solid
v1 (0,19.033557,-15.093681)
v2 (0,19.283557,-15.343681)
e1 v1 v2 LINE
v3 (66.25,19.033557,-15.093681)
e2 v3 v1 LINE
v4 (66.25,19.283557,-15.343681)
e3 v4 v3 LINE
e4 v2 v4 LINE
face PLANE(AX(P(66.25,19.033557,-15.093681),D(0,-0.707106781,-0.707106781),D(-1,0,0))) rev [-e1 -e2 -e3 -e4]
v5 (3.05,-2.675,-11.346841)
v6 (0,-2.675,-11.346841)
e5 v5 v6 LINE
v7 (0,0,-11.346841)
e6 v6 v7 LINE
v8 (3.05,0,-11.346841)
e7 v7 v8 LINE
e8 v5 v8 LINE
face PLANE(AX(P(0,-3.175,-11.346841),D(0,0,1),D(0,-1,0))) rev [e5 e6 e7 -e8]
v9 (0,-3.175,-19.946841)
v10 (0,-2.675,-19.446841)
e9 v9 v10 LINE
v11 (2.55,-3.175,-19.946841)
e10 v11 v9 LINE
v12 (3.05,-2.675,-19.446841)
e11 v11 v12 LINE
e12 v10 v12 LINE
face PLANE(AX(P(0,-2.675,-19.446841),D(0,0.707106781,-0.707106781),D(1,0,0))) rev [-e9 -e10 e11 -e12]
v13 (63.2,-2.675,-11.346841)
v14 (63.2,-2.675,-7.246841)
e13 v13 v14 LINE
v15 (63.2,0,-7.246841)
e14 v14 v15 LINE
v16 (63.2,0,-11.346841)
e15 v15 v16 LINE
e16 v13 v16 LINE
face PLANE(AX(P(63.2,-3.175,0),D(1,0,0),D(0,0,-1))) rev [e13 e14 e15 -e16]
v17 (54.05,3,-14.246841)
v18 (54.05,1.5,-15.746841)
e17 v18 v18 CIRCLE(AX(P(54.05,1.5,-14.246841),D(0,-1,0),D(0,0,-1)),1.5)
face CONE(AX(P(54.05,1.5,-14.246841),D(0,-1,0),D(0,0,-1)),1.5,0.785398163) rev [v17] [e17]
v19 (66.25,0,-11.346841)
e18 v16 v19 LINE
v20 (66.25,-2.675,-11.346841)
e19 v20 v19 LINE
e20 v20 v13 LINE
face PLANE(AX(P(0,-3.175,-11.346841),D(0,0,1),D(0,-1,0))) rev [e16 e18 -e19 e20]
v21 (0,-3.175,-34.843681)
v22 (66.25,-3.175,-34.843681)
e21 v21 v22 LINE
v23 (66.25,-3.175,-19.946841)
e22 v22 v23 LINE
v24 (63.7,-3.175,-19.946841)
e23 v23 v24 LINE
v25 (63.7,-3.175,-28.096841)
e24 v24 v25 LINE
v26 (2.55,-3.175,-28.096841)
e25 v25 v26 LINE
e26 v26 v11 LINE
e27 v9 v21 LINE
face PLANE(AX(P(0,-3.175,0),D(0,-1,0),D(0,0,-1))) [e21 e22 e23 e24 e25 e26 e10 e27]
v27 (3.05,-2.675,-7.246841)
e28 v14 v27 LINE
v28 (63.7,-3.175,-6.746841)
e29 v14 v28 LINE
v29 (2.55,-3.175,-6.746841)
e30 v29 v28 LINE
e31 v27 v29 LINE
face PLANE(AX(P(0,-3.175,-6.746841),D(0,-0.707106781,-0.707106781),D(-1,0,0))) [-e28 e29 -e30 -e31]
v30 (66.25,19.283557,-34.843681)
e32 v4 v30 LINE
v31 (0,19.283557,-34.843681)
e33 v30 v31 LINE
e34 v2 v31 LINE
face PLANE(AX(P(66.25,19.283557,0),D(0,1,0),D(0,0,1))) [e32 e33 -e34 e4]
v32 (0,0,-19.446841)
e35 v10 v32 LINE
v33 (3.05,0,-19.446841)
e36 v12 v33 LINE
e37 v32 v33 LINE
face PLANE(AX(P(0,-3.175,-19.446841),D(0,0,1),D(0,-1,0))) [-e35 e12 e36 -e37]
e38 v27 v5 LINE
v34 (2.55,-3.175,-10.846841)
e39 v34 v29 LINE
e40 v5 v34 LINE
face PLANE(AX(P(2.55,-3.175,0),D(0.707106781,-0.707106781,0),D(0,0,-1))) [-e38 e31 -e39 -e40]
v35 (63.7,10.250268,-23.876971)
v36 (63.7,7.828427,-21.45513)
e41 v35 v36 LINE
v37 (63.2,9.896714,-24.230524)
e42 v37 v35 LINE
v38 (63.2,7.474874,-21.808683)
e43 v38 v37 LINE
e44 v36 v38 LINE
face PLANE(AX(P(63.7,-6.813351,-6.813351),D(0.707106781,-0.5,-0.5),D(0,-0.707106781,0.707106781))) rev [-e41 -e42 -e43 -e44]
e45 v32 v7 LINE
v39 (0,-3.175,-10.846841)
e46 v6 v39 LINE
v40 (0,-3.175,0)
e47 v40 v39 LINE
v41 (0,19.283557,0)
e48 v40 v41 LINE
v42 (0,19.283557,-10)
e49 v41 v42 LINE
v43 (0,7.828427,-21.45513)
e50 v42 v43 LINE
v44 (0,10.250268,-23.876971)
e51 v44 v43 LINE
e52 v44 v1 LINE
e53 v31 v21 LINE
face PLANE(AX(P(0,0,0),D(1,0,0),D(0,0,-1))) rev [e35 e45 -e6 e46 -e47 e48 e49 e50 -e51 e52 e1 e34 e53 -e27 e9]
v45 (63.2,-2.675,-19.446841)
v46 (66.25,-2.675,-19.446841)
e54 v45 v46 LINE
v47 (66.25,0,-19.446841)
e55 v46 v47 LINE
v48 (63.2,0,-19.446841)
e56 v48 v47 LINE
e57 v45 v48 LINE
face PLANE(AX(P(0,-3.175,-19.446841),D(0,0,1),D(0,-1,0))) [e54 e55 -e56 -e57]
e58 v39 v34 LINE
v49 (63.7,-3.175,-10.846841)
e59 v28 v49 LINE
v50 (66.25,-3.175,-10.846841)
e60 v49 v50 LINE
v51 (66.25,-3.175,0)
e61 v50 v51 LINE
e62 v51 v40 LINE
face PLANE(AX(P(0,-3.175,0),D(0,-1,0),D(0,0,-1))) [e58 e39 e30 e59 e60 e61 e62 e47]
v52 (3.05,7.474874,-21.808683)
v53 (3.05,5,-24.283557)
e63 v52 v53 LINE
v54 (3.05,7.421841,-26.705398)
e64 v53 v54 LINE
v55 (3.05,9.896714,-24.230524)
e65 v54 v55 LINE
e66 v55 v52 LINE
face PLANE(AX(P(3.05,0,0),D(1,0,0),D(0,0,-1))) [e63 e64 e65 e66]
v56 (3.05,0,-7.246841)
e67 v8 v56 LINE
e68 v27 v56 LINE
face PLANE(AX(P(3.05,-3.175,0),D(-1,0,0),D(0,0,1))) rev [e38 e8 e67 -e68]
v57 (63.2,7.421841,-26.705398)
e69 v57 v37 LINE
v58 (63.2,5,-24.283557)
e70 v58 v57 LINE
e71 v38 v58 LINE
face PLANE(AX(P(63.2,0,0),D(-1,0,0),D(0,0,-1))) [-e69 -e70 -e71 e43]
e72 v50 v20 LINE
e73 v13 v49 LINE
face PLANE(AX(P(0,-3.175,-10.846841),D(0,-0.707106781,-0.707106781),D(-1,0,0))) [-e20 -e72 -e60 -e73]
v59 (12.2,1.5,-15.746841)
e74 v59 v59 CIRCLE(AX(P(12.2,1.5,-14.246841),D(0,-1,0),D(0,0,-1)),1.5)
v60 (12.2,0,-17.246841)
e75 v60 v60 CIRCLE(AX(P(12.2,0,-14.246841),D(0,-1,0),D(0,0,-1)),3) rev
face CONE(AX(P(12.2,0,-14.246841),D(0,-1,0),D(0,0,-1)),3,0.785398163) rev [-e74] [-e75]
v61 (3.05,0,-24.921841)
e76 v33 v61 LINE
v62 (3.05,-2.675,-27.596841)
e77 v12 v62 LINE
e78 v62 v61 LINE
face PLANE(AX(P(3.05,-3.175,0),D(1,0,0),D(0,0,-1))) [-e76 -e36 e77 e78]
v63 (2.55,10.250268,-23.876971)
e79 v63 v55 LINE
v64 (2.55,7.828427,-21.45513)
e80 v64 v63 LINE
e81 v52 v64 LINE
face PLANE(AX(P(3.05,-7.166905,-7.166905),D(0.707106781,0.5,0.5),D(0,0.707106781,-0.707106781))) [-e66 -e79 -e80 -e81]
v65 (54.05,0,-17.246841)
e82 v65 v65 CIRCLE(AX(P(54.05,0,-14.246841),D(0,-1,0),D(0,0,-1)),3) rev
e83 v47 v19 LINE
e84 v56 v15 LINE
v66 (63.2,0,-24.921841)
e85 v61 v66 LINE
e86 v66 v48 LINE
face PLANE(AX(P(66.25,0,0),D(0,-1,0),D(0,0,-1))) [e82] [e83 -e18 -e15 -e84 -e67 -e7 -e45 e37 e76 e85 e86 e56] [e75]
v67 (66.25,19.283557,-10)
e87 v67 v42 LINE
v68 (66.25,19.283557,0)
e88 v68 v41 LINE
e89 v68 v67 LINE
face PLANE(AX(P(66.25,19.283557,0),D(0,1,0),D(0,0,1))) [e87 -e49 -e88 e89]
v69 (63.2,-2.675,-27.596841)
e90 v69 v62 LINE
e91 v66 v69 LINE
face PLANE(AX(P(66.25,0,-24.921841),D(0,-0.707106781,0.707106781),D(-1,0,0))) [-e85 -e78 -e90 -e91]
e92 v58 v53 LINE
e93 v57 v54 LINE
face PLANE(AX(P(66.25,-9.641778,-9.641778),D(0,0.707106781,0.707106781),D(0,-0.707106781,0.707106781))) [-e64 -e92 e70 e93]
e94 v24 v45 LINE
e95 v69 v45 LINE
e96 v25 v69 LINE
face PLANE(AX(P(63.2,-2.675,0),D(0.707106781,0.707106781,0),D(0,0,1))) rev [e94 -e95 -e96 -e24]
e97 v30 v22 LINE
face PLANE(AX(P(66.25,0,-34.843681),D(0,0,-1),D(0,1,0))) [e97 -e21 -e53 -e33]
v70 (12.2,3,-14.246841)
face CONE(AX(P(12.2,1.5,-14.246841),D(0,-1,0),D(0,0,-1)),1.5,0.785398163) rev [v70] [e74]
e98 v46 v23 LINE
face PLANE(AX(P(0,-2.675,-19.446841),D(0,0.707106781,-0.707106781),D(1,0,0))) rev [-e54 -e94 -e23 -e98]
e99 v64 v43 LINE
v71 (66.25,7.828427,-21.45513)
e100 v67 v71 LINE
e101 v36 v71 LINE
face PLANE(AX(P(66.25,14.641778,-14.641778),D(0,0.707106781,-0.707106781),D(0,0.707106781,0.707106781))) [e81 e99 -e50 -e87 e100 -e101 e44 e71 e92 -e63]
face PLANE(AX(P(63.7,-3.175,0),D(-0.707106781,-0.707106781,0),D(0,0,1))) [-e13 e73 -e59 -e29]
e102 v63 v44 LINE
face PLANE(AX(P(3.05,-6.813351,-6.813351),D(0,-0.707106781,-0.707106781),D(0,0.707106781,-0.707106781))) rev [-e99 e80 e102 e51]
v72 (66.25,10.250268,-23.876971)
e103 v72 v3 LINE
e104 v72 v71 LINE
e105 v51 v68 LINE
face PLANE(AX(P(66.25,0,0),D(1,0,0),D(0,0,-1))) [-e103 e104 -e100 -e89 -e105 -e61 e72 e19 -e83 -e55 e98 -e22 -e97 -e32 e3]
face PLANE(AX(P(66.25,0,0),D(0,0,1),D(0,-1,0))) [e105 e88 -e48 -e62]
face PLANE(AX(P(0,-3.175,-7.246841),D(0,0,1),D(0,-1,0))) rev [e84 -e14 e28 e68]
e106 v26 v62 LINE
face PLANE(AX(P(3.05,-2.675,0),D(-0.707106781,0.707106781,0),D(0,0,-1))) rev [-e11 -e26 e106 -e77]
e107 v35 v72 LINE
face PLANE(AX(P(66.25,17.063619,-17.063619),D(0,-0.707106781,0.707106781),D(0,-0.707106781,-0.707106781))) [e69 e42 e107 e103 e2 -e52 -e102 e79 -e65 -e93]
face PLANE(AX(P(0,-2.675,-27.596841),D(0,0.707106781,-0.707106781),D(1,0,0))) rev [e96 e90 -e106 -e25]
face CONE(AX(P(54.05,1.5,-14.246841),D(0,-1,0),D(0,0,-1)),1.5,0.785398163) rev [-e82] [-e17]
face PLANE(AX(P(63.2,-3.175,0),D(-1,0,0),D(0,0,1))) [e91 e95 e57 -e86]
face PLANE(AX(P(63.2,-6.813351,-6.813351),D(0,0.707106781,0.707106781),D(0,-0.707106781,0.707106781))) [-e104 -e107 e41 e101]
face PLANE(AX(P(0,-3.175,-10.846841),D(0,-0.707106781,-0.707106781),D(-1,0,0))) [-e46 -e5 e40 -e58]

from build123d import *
from OCP.BRepFilletAPI import BRepFilletAPI_MakeChamfer

# Parameters (mm, degrees)
BOSS_EXTRUDE1_DEPTH = 66.25
BOSS_EXTRUDE2_DEPTH = 3.05
BOSS_EXTRUDE3_DEPTH = 3.175
SKETCH2_4_R         = 1.5
CUT_EXTRUDE1_DEPTH  = 3
CHAMFER1_SIZE       = 1.5
CHAMFER3_SIZE       = 2.675
CHAMFER4_SIZE       = 0.5
CHAMFER4_SIZE_2     = 0.353553391


with BuildPart() as part:
    # Sketch1 → Boss-Extrude1 (new body)
    with BuildSketch(Plane(origin=(0, 0, 0), x_dir=(0, 0, -1), z_dir=(1, 0, 0))):
        Polygon((14.843681451, 19.28355698), (34.843681451, 19.28355698), (34.843681451, 0), (0, 0), (0, 19.28355698), (10, 19.28355698), (24.28355698, 5), (26.705397706, 7.421840726), align=None)
    extrude(amount=BOSS_EXTRUDE1_DEPTH)

    # Sketch1<4> → Boss-Extrude2 (add)
    with BuildSketch(Plane(origin=(0, 0, 0), x_dir=(0, 0, -1), z_dir=(1, 0, 0))):
        Polygon((23.876970581, 10.25026785), (21.455129855, 7.828427125), (24.28355698, 5), (26.705397706, 7.421840726), align=None)
    boss_extrude2 = extrude(amount=BOSS_EXTRUDE2_DEPTH)

    # Mirror1: Boss-Extrude2 across plane
    add(boss_extrude2.mirror(Plane.ZY.offset(-33.125)))

    # Sketch2 → Boss-Extrude3 (add)
    with BuildSketch(Plane(origin=(0, 0, 0), x_dir=(1, 0, 0), z_dir=(0, 1, 0))):
        Polygon((0, 11.346840726), (0, 0), (66.25, 0), (66.25, 11.346840726), (63.2, 11.346840726), (63.2, 7.246840726), (3.05, 7.246840726), (3.05, 11.346840726), align=None)
        Polygon((0, 34.843681451), (0, 19.446840726), (3.05, 19.446840726), (3.05, 27.596840726), (63.2, 27.596840726), (63.2, 19.446840726), (66.25, 19.446840726), (66.25, 34.843681451), align=None)
    extrude(amount=-BOSS_EXTRUDE3_DEPTH)

    # Sketch2<4> → Cut-Extrude1 (cut)
    with BuildSketch(Plane(origin=(0, 0, 0), x_dir=(1, 0, 0), z_dir=(0, 1, 0))):
        with Locations(Location((54.05, 14.246840726, 0), (0, 0, 90))):
            Circle(SKETCH2_4_R)
        with Locations(Location((12.2, 14.246840726, 0), (0, 0, 90))):
            Circle(SKETCH2_4_R)
    extrude(amount=CUT_EXTRUDE1_DEPTH, mode=Mode.SUBTRACT)

    # Chamfer1
    chamfer1_edges = [part.edges().sort_by_distance(p)[0] for p in [
        (54.05, 3, -12.746840726),
        (54.05, 0, -12.746840726),
        (12.2, 0, -12.746840726),
        (12.2, 3, -12.746840726),
    ]]
    chamfer(chamfer1_edges, length=CHAMFER1_SIZE - 0.0001)  # a hair under: the kernel refuses the full size

    # Chamfer3
    chamfer3_edges = [part.edges().sort_by_distance(p)[0] for p in [
        (33.125, 0, -27.596840726),
    ]]
    chamfer(chamfer3_edges, length=CHAMFER3_SIZE)

    # Chamfer4
    chamfer4_edges_1 = [part.edges().sort_by_distance(p)[0] for p in [
        (3.05, 9.039347488, -22.666050218),
        (63.2, 9.039347488, -22.666050218),
        (3.05, -3.175, -23.521840726),
        (1.525, -3.175, -19.446840726),
        (63.2, -3.175, -23.521840726),
        (64.725, -3.175, -19.446840726),
        (1.525, -3.175, -11.346840726),
        (3.05, -3.175, -9.296840726),
        (33.125, -3.175, -7.246840726),
        (63.2, -3.175, -9.296840726),
        (64.725, -3.175, -11.346840726),
        (33.125, -3.175, -27.596840726),
    ]]
    chamfer4_edges_2 = [part.edges().sort_by_distance(p)[0] for p in [
        (33.125, 19.28355698, -14.843681451),
    ]]
    chamfer4_side_2 = [part.faces().sort_by_distance(p)[0] for p in [
        (33.125, 19.28355698, -14.850752519),
    ]]
    chamfer4 = BRepFilletAPI_MakeChamfer(part.part.solid().wrapped)
    for e in chamfer4_edges_1:
        chamfer4.Add(CHAMFER4_SIZE - 0.0001, e.wrapped)
    for e in chamfer4_edges_2:
        chamfer4.Add(CHAMFER4_SIZE - 0.0001, CHAMFER4_SIZE_2 - 0.0001, e.wrapped, chamfer4_side_2[0].wrapped)
    add(Compound.cast(chamfer4.Shape()), mode=Mode.REPLACE)  # a hair under: the kernel refuses the full size


solid = part.part
